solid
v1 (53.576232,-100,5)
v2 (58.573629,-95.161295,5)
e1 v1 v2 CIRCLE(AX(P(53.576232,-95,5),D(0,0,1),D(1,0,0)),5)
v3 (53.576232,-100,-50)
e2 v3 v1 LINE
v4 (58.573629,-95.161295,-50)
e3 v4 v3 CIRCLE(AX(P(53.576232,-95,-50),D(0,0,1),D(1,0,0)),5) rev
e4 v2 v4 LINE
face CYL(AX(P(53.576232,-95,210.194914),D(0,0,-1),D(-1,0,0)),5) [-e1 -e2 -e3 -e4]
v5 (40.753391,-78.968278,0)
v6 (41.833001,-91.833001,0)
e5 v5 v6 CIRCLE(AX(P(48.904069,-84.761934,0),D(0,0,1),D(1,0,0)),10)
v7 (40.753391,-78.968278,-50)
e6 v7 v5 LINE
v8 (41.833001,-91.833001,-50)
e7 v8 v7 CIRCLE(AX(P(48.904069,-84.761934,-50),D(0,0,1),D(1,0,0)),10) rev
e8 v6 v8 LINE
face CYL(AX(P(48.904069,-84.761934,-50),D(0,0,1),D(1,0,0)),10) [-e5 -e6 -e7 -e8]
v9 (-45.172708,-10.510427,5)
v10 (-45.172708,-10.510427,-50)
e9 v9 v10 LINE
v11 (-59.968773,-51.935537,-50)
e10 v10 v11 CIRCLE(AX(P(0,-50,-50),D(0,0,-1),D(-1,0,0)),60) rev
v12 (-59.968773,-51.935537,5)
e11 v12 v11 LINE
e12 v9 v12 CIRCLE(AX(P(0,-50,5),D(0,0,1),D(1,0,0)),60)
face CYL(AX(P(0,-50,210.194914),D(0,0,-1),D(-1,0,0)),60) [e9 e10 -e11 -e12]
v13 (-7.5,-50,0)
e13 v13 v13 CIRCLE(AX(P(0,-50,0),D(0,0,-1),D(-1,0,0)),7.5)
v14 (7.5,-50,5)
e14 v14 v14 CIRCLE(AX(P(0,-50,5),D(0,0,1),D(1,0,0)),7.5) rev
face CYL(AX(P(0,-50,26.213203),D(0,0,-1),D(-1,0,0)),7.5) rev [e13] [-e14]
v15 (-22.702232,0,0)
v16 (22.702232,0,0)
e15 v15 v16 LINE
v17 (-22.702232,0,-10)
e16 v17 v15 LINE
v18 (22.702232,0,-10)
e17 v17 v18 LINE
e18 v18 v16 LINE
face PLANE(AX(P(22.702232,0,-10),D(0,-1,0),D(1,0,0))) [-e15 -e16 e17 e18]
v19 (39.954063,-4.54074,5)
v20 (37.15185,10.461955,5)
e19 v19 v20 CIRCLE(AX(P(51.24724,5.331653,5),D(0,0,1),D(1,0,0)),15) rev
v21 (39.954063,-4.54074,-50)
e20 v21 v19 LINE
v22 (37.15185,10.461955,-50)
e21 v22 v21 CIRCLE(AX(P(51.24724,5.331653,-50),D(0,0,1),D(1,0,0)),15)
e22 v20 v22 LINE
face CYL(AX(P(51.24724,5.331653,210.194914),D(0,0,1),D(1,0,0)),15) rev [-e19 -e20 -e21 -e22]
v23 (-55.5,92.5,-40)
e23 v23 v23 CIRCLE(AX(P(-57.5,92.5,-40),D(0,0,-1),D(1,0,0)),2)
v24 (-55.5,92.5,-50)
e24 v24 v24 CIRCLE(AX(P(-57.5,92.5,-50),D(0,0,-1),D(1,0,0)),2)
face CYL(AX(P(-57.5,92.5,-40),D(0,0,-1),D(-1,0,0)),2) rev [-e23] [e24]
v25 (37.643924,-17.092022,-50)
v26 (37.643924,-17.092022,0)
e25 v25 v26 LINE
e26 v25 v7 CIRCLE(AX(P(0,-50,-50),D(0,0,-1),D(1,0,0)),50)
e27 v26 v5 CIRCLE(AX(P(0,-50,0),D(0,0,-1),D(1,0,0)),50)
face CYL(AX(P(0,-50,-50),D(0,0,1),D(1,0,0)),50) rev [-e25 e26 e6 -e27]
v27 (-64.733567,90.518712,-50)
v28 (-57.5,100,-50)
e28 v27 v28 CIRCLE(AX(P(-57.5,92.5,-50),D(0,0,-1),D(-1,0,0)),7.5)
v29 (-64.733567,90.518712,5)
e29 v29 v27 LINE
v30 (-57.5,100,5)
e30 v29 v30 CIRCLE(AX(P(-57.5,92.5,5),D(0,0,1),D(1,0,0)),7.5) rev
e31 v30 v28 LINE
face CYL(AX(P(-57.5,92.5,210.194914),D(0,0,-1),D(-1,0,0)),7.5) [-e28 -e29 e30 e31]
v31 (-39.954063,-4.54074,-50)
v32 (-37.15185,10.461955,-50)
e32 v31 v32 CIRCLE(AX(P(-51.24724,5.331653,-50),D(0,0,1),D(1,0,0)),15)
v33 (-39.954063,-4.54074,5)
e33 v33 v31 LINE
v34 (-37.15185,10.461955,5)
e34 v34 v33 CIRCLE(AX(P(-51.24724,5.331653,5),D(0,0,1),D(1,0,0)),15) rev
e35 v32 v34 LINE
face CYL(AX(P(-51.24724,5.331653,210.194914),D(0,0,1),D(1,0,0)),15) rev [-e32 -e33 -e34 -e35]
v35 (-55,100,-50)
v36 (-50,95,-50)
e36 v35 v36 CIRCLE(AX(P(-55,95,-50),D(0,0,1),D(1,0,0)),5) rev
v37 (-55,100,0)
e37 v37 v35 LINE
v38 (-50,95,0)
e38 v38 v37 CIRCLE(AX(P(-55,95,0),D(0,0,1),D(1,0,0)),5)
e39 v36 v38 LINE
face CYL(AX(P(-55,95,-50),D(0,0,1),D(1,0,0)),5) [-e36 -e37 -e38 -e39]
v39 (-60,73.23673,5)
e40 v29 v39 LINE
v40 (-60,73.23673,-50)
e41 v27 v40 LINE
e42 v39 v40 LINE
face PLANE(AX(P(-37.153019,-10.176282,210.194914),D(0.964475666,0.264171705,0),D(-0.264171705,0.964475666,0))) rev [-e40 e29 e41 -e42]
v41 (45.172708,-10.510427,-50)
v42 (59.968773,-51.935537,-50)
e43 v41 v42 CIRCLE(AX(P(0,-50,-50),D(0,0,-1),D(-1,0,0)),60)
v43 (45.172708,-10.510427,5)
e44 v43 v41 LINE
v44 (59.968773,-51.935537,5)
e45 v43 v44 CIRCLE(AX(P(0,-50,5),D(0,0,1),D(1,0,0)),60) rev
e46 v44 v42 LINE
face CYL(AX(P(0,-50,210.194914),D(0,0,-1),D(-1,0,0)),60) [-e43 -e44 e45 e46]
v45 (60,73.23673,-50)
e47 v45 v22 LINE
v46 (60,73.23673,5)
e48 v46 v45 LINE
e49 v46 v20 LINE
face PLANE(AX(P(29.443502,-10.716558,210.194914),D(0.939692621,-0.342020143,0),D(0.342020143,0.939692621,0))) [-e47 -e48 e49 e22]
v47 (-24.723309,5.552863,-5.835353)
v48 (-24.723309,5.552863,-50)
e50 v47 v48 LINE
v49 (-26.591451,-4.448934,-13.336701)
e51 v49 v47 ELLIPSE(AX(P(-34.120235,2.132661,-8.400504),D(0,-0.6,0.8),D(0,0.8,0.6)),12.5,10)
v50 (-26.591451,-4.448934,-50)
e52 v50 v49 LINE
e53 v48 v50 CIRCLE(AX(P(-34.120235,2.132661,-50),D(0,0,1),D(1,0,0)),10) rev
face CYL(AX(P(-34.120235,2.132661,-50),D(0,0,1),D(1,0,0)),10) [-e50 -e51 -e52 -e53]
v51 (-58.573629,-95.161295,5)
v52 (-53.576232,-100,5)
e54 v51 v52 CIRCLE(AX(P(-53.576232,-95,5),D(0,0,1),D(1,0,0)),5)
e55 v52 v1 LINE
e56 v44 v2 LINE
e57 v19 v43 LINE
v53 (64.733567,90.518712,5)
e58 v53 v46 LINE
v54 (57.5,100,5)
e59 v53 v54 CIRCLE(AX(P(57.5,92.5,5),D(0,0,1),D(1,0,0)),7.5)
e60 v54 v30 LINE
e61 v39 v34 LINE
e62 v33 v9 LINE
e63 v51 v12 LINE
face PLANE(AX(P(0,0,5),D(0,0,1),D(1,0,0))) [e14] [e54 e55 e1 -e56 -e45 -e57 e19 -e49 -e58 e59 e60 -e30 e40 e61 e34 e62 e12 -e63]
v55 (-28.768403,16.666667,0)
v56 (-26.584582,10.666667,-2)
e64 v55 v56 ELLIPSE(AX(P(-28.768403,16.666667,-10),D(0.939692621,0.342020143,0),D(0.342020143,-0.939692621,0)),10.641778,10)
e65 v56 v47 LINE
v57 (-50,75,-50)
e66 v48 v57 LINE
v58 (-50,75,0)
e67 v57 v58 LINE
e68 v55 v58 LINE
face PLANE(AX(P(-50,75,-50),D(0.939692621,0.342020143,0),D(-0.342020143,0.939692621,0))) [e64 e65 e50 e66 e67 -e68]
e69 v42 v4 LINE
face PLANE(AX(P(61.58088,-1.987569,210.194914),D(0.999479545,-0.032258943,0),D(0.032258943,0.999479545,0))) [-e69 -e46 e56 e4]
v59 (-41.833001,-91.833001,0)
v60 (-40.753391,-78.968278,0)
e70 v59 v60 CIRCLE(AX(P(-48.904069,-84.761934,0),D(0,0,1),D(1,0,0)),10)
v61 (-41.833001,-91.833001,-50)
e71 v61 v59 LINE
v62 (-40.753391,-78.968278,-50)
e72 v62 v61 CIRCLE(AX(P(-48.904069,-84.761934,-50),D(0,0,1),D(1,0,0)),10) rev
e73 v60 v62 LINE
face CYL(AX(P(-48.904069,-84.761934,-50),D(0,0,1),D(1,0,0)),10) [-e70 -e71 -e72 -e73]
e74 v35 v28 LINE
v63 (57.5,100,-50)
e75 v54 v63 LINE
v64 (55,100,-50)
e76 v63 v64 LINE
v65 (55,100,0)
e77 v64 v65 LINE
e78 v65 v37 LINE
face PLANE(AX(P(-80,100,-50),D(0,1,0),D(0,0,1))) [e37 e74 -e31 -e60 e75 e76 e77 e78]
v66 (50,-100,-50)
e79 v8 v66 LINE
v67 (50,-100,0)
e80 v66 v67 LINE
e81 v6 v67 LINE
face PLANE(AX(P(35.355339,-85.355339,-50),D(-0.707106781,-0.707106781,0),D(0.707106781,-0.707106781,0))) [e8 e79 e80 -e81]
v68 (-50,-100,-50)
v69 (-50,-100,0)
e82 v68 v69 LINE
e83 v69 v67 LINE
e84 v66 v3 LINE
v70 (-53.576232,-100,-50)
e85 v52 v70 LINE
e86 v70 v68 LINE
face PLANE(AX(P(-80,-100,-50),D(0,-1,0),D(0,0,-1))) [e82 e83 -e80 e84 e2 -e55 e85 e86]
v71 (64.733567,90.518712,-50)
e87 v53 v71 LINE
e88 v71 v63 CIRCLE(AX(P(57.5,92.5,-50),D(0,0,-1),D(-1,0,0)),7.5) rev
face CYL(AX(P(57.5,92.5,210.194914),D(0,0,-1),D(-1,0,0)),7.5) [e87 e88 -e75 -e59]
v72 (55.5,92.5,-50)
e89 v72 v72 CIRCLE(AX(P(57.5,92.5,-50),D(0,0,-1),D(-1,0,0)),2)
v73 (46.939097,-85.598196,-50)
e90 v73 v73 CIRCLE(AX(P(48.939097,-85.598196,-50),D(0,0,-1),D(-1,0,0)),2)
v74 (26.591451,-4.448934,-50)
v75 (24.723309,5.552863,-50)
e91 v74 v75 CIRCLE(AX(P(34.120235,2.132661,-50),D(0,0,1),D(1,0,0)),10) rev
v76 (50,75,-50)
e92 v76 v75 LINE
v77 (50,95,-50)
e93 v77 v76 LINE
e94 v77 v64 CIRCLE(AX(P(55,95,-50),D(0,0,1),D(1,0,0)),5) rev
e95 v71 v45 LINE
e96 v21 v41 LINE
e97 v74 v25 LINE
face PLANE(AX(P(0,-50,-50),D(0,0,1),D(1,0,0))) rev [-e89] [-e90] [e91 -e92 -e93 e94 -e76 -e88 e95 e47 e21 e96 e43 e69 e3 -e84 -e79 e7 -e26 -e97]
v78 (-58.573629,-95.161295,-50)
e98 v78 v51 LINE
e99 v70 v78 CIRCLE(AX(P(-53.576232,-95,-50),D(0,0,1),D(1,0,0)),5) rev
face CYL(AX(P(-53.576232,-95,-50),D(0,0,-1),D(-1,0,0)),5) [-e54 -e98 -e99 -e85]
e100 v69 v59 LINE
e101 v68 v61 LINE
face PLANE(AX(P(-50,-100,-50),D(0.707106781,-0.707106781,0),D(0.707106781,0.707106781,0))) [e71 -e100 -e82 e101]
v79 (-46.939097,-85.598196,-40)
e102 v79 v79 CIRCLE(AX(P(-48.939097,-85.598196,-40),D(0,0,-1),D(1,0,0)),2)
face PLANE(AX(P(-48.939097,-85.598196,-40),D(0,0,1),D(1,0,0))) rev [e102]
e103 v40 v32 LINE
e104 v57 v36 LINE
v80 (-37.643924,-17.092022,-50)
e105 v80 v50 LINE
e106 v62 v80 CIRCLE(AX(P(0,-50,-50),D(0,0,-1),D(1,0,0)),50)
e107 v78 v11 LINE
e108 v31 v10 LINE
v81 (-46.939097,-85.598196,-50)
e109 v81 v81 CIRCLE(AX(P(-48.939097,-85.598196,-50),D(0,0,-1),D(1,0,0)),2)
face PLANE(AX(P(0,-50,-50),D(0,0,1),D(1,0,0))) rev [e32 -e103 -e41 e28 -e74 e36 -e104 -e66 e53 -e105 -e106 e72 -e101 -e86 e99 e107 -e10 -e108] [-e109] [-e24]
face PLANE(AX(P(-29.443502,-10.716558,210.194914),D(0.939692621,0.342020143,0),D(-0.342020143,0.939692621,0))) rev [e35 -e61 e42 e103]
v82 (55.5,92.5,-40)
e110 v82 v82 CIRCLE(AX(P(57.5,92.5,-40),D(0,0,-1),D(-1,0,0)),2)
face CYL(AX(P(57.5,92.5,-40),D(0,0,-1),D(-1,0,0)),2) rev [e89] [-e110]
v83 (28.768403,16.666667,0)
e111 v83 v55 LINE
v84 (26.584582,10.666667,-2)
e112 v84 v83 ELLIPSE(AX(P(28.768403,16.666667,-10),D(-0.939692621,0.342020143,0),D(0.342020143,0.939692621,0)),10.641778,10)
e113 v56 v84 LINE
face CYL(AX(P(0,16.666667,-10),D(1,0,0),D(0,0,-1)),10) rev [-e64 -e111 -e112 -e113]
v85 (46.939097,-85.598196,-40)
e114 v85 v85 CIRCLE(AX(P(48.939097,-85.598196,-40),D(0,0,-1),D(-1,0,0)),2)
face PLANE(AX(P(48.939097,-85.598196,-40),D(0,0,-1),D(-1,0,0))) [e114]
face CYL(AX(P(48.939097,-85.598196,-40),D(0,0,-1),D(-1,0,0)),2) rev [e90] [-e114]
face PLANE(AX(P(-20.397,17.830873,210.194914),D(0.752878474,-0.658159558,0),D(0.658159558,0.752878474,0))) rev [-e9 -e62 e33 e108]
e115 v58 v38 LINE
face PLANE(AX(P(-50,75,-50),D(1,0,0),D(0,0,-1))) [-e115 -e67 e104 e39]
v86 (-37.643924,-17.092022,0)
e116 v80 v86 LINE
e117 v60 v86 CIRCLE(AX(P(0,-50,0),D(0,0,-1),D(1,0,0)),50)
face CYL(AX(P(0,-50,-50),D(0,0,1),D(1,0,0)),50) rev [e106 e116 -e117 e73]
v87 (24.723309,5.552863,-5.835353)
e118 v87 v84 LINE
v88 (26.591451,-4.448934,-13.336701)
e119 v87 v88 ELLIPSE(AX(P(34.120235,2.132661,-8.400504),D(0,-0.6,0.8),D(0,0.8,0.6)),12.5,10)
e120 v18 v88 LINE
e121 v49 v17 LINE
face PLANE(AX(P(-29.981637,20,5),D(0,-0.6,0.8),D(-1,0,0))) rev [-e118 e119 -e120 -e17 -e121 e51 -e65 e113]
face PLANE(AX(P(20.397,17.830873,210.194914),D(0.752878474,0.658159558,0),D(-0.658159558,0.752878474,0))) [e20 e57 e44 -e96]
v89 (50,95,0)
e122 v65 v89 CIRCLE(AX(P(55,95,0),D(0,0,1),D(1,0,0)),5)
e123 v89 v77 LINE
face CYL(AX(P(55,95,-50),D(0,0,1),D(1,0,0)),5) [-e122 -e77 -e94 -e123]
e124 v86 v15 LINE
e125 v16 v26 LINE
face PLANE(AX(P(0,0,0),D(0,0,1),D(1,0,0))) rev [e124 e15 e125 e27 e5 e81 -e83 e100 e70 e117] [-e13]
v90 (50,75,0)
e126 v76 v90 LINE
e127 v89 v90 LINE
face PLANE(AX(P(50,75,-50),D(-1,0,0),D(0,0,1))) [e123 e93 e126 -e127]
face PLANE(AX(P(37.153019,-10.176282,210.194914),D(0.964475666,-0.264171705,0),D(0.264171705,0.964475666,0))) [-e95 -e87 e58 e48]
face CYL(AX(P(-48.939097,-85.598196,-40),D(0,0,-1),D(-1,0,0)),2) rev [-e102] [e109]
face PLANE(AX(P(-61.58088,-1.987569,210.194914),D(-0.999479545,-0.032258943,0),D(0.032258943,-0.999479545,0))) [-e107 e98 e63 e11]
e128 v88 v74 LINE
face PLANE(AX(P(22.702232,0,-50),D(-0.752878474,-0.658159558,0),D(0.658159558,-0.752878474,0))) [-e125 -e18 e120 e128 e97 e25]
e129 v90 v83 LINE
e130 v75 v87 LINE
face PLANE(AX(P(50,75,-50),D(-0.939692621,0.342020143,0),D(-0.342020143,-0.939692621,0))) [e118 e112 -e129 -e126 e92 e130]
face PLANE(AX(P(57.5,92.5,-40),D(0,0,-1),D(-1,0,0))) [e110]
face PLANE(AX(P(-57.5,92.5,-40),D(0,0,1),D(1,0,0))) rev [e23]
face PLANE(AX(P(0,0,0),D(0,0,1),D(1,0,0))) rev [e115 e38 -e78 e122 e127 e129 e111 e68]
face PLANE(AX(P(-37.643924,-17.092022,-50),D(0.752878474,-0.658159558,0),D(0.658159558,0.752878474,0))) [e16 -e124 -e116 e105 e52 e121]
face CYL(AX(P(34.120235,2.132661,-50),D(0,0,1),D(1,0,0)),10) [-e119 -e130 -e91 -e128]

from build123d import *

# Parameters (mm, degrees)
BOSS_EXTRUDE1_DEPTH   = 50
BOSS_EXTRUDE1_2_DEPTH = 50
BOSS_EXTRUDE2_DEPTH   = 10
CHAMFER1_SIZE         = 15
CHAMFER1_SIZE_2       = 20
SKETCH4_W             = 160
SKETCH4_H             = 200
BOSS_EXTRUDE3_DEPTH   = 5
FILLET1_R             = 10
SKETCH5_R             = 7.5
CUT_EXTRUDE1_DEPTH    = 5
CUT_EXTRUDE3_DEPTH    = 55
FILLET3_R             = 15
FILLET4_R             = 5
SKETCH9_R             = 2
CUT_EXTRUDE4_DEPTH    = 10
FILLET6_R             = 5


with BuildPart() as part:
    # Sketch2 → Boss-Extrude1 (new body)
    with BuildSketch(Plane.XY):
        with BuildLine():
            Line((-50, 75), (-22.70223243, 0))
            Line((-22.70223243, 0), (-37.64392369, -17.092022104))
            ThreePointArc((-37.64392369, -17.092022104), (-49.971924127, -51.675350432), (-35.355339059, -85.355339059))
            Line((-35.355339059, -85.355339059), (-50, -100))
            Line((-50, -100), (-80, -100))
            Line((-80, -100), (-80, 100))
            Line((-80, 100), (-50, 100))
            Line((-50, 100), (-50, 75))
        make_face()
    extrude(amount=-BOSS_EXTRUDE1_DEPTH)



with BuildPart() as body_2:
    # Sketch2 → Boss-Extrude1 2 (new body)
    with BuildSketch(Plane.XY):
        with BuildLine():
            Line((50, 75), (22.70223243, 0))
            Line((22.70223243, 0), (37.64392369, -17.092022104))
            ThreePointArc((37.64392369, -17.092022104), (49.971924127, -51.675350432), (35.355339059, -85.355339059))
            Line((35.355339059, -85.355339059), (50, -100))
            Line((50, -100), (80, -100))
            Line((80, -100), (80, 100))
            Line((80, 100), (50, 100))
            Line((50, 100), (50, 75))
        make_face()
    extrude(amount=-BOSS_EXTRUDE1_2_DEPTH)


with BuildPart() as part_1:
    add(part.part)

    add(body_2.part)  # Boss-Extrude2 merges body 2
    # Sketch3 → Boss-Extrude2 (add)
    with BuildSketch(Plane.XY):
        Polygon((-29.981637115, 20), (29.981637115, 20), (22.70223243, 0), (-22.70223243, 0), align=None)
    extrude(amount=-BOSS_EXTRUDE2_DEPTH)

    # Chamfer1
    # the kernel refuses this chamfer: 20, 15 mm, written as the material it takes off along each edge
    with BuildSketch(Plane(origin=(-81.595588718, 20, -10), x_dir=(0, 0.041308380137954244, 0.9991464445867674), z_dir=(1, 0, 0))) as chamfer1_piece_1_section:
        Polygon((CHAMFER1_SIZE * 0.999146444587, CHAMFER1_SIZE * 0.041308380138), (-CHAMFER1_SIZE_2 * 0.041308380138, CHAMFER1_SIZE_2 * 0.999146444587), (0, 0), align=None)
    chamfer1_piece_1 = extrude(amount=163.191177435, mode=Mode.PRIVATE)
    chamfer1_piece_1 = split(chamfer1_piece_1, bisect_by=Plane(origin=(-24.447399798, 4.794807938, -4.975922198), z_dir=(0.9396926207859094, 0.3420201433256661, 0)), keep=Keep.TOP, mode=Mode.PRIVATE)
    chamfer1_piece_1 = split(chamfer1_piece_1, bisect_by=Plane(origin=(24.447399798, 4.794807938, -4.975922198), z_dir=(-0.939692620785907, 0.34202014332567265, 0)), keep=Keep.TOP, mode=Mode.PRIVATE)
    add(chamfer1_piece_1, mode=Mode.SUBTRACT)

    # Sketch4 → Boss-Extrude3 (add)
    with BuildSketch(Plane.XY):
        Rectangle(SKETCH4_W, SKETCH4_H)
    extrude(amount=BOSS_EXTRUDE3_DEPTH)

    # Fillet1
    fillet1_edges = [part_1.edges().sort_by_distance(p)[0] for p in [
        (0, 13.333333333, 0),
        (-22.70223243, 0, -30),
        (-35.355339059, -85.355339059, -25),
        (35.355339059, -85.355339059, -25),
        (22.70223243, 0, -30),
    ]]
    fillet(fillet1_edges, radius=FILLET1_R)

    # Sketch5 → Cut-Extrude1 (cut)
    with BuildSketch(Plane(origin=(0, 0, 0), x_dir=(-1, 0, 0), z_dir=(0, 0, -1))):
        with Locations((0, -50)):
            Circle(SKETCH5_R)
    extrude(amount=-CUT_EXTRUDE1_DEPTH, mode=Mode.SUBTRACT)

    # Sketch8 → Cut-Extrude3 (cut)
    with BuildSketch(Plane(origin=(0, 0, -50), x_dir=(-1, 0, 0), z_dir=(0, 0, -1))):
        with BuildLine():
            Line((-60, 100), (-80, 100))
            Line((-80, 100), (-80, -100))
            Line((-80, -100), (-58.41745651, -100))
            Line((-58.41745651, -100), (-58.898864587, -85.084522946))
            Line((-58.898864587, -85.084522946), (-59.968772691, -51.935536587))
            ThreePointArc((-59.968772691, -51.935536587), (-56.503917554, -29.818144261), (-45.172708428, -10.510426525))
            Line((-45.172708428, -10.510426525), (-34.120235365, 2.132661237))
            Line((-34.120235365, 2.132661237), (-60, 73.236730193))
            Line((-60, 73.236730193), (-64.733567494, 90.51871221))
            ThreePointArc((-64.733567494, 90.51871221), (-63.462787034, 97.049194521), (-57.5, 100))
            Line((-57.5, 100), (-60, 100))
        make_face()
        with BuildLine():
            Line((34.120235365, 2.132661237), (45.172708428, -10.510426525))
            ThreePointArc((45.172708428, -10.510426525), (56.503917554, -29.818144261), (59.968772691, -51.935536587))
            Line((59.968772691, -51.935536587), (58.898864587, -85.084522946))
            Line((58.898864587, -85.084522946), (58.41745651, -100))
            Line((58.41745651, -100), (80, -100))
            Line((80, -100), (80, 100))
            Line((80, 100), (60, 100))
            Line((60, 100), (57.5, 100))
            ThreePointArc((57.5, 100), (63.462787034, 97.049194521), (64.733567494, 90.51871221))
            Line((64.733567494, 90.51871221), (60, 73.236730193))
            Line((60, 73.236730193), (34.120235365, 2.132661237))
        make_face()
    extrude(amount=-CUT_EXTRUDE3_DEPTH, mode=Mode.SUBTRACT)

    # Fillet3
    fillet3_edges = [part_1.edges().sort_by_distance(p)[0] for p in [
        (34.120235365, 2.132661237, -22.5),
        (-34.120235365, 2.132661237, -22.5),
    ]]
    fillet(fillet3_edges, radius=FILLET3_R)

    # Fillet4
    fillet4_edges = [part_1.edges().sort_by_distance(p)[0] for p in [
        (-50, 100, -25),
        (50, 100, -25),
    ]]
    fillet(fillet4_edges, radius=FILLET4_R)

    # Sketch9 → Cut-Extrude4 (cut)
    with BuildSketch(Plane(origin=(0, 0, -50), x_dir=(-1, 0, 0), z_dir=(0, 0, -1))):
        with Locations((-57.5, 92.5)):
            Circle(SKETCH9_R)
        with Locations((-48.939097244, -85.598196118)):
            Circle(SKETCH9_R)
        with Locations(Location((48.939097244, -85.598196118, 0), (0, 0, 180))):
            Circle(SKETCH9_R)
        with Locations(Location((57.5, 92.5, 0), (0, 0, 180))):
            Circle(SKETCH9_R)
    extrude(amount=-CUT_EXTRUDE4_DEPTH, mode=Mode.SUBTRACT)

    # Fillet6
    fillet6_edges = [part_1.edges().sort_by_distance(p)[0] for p in [
        (58.41745651, -100, -22.5),
        (-58.41745651, -100, -22.5),
    ]]
    fillet(fillet6_edges, radius=FILLET6_R)


solid = part_1.part
